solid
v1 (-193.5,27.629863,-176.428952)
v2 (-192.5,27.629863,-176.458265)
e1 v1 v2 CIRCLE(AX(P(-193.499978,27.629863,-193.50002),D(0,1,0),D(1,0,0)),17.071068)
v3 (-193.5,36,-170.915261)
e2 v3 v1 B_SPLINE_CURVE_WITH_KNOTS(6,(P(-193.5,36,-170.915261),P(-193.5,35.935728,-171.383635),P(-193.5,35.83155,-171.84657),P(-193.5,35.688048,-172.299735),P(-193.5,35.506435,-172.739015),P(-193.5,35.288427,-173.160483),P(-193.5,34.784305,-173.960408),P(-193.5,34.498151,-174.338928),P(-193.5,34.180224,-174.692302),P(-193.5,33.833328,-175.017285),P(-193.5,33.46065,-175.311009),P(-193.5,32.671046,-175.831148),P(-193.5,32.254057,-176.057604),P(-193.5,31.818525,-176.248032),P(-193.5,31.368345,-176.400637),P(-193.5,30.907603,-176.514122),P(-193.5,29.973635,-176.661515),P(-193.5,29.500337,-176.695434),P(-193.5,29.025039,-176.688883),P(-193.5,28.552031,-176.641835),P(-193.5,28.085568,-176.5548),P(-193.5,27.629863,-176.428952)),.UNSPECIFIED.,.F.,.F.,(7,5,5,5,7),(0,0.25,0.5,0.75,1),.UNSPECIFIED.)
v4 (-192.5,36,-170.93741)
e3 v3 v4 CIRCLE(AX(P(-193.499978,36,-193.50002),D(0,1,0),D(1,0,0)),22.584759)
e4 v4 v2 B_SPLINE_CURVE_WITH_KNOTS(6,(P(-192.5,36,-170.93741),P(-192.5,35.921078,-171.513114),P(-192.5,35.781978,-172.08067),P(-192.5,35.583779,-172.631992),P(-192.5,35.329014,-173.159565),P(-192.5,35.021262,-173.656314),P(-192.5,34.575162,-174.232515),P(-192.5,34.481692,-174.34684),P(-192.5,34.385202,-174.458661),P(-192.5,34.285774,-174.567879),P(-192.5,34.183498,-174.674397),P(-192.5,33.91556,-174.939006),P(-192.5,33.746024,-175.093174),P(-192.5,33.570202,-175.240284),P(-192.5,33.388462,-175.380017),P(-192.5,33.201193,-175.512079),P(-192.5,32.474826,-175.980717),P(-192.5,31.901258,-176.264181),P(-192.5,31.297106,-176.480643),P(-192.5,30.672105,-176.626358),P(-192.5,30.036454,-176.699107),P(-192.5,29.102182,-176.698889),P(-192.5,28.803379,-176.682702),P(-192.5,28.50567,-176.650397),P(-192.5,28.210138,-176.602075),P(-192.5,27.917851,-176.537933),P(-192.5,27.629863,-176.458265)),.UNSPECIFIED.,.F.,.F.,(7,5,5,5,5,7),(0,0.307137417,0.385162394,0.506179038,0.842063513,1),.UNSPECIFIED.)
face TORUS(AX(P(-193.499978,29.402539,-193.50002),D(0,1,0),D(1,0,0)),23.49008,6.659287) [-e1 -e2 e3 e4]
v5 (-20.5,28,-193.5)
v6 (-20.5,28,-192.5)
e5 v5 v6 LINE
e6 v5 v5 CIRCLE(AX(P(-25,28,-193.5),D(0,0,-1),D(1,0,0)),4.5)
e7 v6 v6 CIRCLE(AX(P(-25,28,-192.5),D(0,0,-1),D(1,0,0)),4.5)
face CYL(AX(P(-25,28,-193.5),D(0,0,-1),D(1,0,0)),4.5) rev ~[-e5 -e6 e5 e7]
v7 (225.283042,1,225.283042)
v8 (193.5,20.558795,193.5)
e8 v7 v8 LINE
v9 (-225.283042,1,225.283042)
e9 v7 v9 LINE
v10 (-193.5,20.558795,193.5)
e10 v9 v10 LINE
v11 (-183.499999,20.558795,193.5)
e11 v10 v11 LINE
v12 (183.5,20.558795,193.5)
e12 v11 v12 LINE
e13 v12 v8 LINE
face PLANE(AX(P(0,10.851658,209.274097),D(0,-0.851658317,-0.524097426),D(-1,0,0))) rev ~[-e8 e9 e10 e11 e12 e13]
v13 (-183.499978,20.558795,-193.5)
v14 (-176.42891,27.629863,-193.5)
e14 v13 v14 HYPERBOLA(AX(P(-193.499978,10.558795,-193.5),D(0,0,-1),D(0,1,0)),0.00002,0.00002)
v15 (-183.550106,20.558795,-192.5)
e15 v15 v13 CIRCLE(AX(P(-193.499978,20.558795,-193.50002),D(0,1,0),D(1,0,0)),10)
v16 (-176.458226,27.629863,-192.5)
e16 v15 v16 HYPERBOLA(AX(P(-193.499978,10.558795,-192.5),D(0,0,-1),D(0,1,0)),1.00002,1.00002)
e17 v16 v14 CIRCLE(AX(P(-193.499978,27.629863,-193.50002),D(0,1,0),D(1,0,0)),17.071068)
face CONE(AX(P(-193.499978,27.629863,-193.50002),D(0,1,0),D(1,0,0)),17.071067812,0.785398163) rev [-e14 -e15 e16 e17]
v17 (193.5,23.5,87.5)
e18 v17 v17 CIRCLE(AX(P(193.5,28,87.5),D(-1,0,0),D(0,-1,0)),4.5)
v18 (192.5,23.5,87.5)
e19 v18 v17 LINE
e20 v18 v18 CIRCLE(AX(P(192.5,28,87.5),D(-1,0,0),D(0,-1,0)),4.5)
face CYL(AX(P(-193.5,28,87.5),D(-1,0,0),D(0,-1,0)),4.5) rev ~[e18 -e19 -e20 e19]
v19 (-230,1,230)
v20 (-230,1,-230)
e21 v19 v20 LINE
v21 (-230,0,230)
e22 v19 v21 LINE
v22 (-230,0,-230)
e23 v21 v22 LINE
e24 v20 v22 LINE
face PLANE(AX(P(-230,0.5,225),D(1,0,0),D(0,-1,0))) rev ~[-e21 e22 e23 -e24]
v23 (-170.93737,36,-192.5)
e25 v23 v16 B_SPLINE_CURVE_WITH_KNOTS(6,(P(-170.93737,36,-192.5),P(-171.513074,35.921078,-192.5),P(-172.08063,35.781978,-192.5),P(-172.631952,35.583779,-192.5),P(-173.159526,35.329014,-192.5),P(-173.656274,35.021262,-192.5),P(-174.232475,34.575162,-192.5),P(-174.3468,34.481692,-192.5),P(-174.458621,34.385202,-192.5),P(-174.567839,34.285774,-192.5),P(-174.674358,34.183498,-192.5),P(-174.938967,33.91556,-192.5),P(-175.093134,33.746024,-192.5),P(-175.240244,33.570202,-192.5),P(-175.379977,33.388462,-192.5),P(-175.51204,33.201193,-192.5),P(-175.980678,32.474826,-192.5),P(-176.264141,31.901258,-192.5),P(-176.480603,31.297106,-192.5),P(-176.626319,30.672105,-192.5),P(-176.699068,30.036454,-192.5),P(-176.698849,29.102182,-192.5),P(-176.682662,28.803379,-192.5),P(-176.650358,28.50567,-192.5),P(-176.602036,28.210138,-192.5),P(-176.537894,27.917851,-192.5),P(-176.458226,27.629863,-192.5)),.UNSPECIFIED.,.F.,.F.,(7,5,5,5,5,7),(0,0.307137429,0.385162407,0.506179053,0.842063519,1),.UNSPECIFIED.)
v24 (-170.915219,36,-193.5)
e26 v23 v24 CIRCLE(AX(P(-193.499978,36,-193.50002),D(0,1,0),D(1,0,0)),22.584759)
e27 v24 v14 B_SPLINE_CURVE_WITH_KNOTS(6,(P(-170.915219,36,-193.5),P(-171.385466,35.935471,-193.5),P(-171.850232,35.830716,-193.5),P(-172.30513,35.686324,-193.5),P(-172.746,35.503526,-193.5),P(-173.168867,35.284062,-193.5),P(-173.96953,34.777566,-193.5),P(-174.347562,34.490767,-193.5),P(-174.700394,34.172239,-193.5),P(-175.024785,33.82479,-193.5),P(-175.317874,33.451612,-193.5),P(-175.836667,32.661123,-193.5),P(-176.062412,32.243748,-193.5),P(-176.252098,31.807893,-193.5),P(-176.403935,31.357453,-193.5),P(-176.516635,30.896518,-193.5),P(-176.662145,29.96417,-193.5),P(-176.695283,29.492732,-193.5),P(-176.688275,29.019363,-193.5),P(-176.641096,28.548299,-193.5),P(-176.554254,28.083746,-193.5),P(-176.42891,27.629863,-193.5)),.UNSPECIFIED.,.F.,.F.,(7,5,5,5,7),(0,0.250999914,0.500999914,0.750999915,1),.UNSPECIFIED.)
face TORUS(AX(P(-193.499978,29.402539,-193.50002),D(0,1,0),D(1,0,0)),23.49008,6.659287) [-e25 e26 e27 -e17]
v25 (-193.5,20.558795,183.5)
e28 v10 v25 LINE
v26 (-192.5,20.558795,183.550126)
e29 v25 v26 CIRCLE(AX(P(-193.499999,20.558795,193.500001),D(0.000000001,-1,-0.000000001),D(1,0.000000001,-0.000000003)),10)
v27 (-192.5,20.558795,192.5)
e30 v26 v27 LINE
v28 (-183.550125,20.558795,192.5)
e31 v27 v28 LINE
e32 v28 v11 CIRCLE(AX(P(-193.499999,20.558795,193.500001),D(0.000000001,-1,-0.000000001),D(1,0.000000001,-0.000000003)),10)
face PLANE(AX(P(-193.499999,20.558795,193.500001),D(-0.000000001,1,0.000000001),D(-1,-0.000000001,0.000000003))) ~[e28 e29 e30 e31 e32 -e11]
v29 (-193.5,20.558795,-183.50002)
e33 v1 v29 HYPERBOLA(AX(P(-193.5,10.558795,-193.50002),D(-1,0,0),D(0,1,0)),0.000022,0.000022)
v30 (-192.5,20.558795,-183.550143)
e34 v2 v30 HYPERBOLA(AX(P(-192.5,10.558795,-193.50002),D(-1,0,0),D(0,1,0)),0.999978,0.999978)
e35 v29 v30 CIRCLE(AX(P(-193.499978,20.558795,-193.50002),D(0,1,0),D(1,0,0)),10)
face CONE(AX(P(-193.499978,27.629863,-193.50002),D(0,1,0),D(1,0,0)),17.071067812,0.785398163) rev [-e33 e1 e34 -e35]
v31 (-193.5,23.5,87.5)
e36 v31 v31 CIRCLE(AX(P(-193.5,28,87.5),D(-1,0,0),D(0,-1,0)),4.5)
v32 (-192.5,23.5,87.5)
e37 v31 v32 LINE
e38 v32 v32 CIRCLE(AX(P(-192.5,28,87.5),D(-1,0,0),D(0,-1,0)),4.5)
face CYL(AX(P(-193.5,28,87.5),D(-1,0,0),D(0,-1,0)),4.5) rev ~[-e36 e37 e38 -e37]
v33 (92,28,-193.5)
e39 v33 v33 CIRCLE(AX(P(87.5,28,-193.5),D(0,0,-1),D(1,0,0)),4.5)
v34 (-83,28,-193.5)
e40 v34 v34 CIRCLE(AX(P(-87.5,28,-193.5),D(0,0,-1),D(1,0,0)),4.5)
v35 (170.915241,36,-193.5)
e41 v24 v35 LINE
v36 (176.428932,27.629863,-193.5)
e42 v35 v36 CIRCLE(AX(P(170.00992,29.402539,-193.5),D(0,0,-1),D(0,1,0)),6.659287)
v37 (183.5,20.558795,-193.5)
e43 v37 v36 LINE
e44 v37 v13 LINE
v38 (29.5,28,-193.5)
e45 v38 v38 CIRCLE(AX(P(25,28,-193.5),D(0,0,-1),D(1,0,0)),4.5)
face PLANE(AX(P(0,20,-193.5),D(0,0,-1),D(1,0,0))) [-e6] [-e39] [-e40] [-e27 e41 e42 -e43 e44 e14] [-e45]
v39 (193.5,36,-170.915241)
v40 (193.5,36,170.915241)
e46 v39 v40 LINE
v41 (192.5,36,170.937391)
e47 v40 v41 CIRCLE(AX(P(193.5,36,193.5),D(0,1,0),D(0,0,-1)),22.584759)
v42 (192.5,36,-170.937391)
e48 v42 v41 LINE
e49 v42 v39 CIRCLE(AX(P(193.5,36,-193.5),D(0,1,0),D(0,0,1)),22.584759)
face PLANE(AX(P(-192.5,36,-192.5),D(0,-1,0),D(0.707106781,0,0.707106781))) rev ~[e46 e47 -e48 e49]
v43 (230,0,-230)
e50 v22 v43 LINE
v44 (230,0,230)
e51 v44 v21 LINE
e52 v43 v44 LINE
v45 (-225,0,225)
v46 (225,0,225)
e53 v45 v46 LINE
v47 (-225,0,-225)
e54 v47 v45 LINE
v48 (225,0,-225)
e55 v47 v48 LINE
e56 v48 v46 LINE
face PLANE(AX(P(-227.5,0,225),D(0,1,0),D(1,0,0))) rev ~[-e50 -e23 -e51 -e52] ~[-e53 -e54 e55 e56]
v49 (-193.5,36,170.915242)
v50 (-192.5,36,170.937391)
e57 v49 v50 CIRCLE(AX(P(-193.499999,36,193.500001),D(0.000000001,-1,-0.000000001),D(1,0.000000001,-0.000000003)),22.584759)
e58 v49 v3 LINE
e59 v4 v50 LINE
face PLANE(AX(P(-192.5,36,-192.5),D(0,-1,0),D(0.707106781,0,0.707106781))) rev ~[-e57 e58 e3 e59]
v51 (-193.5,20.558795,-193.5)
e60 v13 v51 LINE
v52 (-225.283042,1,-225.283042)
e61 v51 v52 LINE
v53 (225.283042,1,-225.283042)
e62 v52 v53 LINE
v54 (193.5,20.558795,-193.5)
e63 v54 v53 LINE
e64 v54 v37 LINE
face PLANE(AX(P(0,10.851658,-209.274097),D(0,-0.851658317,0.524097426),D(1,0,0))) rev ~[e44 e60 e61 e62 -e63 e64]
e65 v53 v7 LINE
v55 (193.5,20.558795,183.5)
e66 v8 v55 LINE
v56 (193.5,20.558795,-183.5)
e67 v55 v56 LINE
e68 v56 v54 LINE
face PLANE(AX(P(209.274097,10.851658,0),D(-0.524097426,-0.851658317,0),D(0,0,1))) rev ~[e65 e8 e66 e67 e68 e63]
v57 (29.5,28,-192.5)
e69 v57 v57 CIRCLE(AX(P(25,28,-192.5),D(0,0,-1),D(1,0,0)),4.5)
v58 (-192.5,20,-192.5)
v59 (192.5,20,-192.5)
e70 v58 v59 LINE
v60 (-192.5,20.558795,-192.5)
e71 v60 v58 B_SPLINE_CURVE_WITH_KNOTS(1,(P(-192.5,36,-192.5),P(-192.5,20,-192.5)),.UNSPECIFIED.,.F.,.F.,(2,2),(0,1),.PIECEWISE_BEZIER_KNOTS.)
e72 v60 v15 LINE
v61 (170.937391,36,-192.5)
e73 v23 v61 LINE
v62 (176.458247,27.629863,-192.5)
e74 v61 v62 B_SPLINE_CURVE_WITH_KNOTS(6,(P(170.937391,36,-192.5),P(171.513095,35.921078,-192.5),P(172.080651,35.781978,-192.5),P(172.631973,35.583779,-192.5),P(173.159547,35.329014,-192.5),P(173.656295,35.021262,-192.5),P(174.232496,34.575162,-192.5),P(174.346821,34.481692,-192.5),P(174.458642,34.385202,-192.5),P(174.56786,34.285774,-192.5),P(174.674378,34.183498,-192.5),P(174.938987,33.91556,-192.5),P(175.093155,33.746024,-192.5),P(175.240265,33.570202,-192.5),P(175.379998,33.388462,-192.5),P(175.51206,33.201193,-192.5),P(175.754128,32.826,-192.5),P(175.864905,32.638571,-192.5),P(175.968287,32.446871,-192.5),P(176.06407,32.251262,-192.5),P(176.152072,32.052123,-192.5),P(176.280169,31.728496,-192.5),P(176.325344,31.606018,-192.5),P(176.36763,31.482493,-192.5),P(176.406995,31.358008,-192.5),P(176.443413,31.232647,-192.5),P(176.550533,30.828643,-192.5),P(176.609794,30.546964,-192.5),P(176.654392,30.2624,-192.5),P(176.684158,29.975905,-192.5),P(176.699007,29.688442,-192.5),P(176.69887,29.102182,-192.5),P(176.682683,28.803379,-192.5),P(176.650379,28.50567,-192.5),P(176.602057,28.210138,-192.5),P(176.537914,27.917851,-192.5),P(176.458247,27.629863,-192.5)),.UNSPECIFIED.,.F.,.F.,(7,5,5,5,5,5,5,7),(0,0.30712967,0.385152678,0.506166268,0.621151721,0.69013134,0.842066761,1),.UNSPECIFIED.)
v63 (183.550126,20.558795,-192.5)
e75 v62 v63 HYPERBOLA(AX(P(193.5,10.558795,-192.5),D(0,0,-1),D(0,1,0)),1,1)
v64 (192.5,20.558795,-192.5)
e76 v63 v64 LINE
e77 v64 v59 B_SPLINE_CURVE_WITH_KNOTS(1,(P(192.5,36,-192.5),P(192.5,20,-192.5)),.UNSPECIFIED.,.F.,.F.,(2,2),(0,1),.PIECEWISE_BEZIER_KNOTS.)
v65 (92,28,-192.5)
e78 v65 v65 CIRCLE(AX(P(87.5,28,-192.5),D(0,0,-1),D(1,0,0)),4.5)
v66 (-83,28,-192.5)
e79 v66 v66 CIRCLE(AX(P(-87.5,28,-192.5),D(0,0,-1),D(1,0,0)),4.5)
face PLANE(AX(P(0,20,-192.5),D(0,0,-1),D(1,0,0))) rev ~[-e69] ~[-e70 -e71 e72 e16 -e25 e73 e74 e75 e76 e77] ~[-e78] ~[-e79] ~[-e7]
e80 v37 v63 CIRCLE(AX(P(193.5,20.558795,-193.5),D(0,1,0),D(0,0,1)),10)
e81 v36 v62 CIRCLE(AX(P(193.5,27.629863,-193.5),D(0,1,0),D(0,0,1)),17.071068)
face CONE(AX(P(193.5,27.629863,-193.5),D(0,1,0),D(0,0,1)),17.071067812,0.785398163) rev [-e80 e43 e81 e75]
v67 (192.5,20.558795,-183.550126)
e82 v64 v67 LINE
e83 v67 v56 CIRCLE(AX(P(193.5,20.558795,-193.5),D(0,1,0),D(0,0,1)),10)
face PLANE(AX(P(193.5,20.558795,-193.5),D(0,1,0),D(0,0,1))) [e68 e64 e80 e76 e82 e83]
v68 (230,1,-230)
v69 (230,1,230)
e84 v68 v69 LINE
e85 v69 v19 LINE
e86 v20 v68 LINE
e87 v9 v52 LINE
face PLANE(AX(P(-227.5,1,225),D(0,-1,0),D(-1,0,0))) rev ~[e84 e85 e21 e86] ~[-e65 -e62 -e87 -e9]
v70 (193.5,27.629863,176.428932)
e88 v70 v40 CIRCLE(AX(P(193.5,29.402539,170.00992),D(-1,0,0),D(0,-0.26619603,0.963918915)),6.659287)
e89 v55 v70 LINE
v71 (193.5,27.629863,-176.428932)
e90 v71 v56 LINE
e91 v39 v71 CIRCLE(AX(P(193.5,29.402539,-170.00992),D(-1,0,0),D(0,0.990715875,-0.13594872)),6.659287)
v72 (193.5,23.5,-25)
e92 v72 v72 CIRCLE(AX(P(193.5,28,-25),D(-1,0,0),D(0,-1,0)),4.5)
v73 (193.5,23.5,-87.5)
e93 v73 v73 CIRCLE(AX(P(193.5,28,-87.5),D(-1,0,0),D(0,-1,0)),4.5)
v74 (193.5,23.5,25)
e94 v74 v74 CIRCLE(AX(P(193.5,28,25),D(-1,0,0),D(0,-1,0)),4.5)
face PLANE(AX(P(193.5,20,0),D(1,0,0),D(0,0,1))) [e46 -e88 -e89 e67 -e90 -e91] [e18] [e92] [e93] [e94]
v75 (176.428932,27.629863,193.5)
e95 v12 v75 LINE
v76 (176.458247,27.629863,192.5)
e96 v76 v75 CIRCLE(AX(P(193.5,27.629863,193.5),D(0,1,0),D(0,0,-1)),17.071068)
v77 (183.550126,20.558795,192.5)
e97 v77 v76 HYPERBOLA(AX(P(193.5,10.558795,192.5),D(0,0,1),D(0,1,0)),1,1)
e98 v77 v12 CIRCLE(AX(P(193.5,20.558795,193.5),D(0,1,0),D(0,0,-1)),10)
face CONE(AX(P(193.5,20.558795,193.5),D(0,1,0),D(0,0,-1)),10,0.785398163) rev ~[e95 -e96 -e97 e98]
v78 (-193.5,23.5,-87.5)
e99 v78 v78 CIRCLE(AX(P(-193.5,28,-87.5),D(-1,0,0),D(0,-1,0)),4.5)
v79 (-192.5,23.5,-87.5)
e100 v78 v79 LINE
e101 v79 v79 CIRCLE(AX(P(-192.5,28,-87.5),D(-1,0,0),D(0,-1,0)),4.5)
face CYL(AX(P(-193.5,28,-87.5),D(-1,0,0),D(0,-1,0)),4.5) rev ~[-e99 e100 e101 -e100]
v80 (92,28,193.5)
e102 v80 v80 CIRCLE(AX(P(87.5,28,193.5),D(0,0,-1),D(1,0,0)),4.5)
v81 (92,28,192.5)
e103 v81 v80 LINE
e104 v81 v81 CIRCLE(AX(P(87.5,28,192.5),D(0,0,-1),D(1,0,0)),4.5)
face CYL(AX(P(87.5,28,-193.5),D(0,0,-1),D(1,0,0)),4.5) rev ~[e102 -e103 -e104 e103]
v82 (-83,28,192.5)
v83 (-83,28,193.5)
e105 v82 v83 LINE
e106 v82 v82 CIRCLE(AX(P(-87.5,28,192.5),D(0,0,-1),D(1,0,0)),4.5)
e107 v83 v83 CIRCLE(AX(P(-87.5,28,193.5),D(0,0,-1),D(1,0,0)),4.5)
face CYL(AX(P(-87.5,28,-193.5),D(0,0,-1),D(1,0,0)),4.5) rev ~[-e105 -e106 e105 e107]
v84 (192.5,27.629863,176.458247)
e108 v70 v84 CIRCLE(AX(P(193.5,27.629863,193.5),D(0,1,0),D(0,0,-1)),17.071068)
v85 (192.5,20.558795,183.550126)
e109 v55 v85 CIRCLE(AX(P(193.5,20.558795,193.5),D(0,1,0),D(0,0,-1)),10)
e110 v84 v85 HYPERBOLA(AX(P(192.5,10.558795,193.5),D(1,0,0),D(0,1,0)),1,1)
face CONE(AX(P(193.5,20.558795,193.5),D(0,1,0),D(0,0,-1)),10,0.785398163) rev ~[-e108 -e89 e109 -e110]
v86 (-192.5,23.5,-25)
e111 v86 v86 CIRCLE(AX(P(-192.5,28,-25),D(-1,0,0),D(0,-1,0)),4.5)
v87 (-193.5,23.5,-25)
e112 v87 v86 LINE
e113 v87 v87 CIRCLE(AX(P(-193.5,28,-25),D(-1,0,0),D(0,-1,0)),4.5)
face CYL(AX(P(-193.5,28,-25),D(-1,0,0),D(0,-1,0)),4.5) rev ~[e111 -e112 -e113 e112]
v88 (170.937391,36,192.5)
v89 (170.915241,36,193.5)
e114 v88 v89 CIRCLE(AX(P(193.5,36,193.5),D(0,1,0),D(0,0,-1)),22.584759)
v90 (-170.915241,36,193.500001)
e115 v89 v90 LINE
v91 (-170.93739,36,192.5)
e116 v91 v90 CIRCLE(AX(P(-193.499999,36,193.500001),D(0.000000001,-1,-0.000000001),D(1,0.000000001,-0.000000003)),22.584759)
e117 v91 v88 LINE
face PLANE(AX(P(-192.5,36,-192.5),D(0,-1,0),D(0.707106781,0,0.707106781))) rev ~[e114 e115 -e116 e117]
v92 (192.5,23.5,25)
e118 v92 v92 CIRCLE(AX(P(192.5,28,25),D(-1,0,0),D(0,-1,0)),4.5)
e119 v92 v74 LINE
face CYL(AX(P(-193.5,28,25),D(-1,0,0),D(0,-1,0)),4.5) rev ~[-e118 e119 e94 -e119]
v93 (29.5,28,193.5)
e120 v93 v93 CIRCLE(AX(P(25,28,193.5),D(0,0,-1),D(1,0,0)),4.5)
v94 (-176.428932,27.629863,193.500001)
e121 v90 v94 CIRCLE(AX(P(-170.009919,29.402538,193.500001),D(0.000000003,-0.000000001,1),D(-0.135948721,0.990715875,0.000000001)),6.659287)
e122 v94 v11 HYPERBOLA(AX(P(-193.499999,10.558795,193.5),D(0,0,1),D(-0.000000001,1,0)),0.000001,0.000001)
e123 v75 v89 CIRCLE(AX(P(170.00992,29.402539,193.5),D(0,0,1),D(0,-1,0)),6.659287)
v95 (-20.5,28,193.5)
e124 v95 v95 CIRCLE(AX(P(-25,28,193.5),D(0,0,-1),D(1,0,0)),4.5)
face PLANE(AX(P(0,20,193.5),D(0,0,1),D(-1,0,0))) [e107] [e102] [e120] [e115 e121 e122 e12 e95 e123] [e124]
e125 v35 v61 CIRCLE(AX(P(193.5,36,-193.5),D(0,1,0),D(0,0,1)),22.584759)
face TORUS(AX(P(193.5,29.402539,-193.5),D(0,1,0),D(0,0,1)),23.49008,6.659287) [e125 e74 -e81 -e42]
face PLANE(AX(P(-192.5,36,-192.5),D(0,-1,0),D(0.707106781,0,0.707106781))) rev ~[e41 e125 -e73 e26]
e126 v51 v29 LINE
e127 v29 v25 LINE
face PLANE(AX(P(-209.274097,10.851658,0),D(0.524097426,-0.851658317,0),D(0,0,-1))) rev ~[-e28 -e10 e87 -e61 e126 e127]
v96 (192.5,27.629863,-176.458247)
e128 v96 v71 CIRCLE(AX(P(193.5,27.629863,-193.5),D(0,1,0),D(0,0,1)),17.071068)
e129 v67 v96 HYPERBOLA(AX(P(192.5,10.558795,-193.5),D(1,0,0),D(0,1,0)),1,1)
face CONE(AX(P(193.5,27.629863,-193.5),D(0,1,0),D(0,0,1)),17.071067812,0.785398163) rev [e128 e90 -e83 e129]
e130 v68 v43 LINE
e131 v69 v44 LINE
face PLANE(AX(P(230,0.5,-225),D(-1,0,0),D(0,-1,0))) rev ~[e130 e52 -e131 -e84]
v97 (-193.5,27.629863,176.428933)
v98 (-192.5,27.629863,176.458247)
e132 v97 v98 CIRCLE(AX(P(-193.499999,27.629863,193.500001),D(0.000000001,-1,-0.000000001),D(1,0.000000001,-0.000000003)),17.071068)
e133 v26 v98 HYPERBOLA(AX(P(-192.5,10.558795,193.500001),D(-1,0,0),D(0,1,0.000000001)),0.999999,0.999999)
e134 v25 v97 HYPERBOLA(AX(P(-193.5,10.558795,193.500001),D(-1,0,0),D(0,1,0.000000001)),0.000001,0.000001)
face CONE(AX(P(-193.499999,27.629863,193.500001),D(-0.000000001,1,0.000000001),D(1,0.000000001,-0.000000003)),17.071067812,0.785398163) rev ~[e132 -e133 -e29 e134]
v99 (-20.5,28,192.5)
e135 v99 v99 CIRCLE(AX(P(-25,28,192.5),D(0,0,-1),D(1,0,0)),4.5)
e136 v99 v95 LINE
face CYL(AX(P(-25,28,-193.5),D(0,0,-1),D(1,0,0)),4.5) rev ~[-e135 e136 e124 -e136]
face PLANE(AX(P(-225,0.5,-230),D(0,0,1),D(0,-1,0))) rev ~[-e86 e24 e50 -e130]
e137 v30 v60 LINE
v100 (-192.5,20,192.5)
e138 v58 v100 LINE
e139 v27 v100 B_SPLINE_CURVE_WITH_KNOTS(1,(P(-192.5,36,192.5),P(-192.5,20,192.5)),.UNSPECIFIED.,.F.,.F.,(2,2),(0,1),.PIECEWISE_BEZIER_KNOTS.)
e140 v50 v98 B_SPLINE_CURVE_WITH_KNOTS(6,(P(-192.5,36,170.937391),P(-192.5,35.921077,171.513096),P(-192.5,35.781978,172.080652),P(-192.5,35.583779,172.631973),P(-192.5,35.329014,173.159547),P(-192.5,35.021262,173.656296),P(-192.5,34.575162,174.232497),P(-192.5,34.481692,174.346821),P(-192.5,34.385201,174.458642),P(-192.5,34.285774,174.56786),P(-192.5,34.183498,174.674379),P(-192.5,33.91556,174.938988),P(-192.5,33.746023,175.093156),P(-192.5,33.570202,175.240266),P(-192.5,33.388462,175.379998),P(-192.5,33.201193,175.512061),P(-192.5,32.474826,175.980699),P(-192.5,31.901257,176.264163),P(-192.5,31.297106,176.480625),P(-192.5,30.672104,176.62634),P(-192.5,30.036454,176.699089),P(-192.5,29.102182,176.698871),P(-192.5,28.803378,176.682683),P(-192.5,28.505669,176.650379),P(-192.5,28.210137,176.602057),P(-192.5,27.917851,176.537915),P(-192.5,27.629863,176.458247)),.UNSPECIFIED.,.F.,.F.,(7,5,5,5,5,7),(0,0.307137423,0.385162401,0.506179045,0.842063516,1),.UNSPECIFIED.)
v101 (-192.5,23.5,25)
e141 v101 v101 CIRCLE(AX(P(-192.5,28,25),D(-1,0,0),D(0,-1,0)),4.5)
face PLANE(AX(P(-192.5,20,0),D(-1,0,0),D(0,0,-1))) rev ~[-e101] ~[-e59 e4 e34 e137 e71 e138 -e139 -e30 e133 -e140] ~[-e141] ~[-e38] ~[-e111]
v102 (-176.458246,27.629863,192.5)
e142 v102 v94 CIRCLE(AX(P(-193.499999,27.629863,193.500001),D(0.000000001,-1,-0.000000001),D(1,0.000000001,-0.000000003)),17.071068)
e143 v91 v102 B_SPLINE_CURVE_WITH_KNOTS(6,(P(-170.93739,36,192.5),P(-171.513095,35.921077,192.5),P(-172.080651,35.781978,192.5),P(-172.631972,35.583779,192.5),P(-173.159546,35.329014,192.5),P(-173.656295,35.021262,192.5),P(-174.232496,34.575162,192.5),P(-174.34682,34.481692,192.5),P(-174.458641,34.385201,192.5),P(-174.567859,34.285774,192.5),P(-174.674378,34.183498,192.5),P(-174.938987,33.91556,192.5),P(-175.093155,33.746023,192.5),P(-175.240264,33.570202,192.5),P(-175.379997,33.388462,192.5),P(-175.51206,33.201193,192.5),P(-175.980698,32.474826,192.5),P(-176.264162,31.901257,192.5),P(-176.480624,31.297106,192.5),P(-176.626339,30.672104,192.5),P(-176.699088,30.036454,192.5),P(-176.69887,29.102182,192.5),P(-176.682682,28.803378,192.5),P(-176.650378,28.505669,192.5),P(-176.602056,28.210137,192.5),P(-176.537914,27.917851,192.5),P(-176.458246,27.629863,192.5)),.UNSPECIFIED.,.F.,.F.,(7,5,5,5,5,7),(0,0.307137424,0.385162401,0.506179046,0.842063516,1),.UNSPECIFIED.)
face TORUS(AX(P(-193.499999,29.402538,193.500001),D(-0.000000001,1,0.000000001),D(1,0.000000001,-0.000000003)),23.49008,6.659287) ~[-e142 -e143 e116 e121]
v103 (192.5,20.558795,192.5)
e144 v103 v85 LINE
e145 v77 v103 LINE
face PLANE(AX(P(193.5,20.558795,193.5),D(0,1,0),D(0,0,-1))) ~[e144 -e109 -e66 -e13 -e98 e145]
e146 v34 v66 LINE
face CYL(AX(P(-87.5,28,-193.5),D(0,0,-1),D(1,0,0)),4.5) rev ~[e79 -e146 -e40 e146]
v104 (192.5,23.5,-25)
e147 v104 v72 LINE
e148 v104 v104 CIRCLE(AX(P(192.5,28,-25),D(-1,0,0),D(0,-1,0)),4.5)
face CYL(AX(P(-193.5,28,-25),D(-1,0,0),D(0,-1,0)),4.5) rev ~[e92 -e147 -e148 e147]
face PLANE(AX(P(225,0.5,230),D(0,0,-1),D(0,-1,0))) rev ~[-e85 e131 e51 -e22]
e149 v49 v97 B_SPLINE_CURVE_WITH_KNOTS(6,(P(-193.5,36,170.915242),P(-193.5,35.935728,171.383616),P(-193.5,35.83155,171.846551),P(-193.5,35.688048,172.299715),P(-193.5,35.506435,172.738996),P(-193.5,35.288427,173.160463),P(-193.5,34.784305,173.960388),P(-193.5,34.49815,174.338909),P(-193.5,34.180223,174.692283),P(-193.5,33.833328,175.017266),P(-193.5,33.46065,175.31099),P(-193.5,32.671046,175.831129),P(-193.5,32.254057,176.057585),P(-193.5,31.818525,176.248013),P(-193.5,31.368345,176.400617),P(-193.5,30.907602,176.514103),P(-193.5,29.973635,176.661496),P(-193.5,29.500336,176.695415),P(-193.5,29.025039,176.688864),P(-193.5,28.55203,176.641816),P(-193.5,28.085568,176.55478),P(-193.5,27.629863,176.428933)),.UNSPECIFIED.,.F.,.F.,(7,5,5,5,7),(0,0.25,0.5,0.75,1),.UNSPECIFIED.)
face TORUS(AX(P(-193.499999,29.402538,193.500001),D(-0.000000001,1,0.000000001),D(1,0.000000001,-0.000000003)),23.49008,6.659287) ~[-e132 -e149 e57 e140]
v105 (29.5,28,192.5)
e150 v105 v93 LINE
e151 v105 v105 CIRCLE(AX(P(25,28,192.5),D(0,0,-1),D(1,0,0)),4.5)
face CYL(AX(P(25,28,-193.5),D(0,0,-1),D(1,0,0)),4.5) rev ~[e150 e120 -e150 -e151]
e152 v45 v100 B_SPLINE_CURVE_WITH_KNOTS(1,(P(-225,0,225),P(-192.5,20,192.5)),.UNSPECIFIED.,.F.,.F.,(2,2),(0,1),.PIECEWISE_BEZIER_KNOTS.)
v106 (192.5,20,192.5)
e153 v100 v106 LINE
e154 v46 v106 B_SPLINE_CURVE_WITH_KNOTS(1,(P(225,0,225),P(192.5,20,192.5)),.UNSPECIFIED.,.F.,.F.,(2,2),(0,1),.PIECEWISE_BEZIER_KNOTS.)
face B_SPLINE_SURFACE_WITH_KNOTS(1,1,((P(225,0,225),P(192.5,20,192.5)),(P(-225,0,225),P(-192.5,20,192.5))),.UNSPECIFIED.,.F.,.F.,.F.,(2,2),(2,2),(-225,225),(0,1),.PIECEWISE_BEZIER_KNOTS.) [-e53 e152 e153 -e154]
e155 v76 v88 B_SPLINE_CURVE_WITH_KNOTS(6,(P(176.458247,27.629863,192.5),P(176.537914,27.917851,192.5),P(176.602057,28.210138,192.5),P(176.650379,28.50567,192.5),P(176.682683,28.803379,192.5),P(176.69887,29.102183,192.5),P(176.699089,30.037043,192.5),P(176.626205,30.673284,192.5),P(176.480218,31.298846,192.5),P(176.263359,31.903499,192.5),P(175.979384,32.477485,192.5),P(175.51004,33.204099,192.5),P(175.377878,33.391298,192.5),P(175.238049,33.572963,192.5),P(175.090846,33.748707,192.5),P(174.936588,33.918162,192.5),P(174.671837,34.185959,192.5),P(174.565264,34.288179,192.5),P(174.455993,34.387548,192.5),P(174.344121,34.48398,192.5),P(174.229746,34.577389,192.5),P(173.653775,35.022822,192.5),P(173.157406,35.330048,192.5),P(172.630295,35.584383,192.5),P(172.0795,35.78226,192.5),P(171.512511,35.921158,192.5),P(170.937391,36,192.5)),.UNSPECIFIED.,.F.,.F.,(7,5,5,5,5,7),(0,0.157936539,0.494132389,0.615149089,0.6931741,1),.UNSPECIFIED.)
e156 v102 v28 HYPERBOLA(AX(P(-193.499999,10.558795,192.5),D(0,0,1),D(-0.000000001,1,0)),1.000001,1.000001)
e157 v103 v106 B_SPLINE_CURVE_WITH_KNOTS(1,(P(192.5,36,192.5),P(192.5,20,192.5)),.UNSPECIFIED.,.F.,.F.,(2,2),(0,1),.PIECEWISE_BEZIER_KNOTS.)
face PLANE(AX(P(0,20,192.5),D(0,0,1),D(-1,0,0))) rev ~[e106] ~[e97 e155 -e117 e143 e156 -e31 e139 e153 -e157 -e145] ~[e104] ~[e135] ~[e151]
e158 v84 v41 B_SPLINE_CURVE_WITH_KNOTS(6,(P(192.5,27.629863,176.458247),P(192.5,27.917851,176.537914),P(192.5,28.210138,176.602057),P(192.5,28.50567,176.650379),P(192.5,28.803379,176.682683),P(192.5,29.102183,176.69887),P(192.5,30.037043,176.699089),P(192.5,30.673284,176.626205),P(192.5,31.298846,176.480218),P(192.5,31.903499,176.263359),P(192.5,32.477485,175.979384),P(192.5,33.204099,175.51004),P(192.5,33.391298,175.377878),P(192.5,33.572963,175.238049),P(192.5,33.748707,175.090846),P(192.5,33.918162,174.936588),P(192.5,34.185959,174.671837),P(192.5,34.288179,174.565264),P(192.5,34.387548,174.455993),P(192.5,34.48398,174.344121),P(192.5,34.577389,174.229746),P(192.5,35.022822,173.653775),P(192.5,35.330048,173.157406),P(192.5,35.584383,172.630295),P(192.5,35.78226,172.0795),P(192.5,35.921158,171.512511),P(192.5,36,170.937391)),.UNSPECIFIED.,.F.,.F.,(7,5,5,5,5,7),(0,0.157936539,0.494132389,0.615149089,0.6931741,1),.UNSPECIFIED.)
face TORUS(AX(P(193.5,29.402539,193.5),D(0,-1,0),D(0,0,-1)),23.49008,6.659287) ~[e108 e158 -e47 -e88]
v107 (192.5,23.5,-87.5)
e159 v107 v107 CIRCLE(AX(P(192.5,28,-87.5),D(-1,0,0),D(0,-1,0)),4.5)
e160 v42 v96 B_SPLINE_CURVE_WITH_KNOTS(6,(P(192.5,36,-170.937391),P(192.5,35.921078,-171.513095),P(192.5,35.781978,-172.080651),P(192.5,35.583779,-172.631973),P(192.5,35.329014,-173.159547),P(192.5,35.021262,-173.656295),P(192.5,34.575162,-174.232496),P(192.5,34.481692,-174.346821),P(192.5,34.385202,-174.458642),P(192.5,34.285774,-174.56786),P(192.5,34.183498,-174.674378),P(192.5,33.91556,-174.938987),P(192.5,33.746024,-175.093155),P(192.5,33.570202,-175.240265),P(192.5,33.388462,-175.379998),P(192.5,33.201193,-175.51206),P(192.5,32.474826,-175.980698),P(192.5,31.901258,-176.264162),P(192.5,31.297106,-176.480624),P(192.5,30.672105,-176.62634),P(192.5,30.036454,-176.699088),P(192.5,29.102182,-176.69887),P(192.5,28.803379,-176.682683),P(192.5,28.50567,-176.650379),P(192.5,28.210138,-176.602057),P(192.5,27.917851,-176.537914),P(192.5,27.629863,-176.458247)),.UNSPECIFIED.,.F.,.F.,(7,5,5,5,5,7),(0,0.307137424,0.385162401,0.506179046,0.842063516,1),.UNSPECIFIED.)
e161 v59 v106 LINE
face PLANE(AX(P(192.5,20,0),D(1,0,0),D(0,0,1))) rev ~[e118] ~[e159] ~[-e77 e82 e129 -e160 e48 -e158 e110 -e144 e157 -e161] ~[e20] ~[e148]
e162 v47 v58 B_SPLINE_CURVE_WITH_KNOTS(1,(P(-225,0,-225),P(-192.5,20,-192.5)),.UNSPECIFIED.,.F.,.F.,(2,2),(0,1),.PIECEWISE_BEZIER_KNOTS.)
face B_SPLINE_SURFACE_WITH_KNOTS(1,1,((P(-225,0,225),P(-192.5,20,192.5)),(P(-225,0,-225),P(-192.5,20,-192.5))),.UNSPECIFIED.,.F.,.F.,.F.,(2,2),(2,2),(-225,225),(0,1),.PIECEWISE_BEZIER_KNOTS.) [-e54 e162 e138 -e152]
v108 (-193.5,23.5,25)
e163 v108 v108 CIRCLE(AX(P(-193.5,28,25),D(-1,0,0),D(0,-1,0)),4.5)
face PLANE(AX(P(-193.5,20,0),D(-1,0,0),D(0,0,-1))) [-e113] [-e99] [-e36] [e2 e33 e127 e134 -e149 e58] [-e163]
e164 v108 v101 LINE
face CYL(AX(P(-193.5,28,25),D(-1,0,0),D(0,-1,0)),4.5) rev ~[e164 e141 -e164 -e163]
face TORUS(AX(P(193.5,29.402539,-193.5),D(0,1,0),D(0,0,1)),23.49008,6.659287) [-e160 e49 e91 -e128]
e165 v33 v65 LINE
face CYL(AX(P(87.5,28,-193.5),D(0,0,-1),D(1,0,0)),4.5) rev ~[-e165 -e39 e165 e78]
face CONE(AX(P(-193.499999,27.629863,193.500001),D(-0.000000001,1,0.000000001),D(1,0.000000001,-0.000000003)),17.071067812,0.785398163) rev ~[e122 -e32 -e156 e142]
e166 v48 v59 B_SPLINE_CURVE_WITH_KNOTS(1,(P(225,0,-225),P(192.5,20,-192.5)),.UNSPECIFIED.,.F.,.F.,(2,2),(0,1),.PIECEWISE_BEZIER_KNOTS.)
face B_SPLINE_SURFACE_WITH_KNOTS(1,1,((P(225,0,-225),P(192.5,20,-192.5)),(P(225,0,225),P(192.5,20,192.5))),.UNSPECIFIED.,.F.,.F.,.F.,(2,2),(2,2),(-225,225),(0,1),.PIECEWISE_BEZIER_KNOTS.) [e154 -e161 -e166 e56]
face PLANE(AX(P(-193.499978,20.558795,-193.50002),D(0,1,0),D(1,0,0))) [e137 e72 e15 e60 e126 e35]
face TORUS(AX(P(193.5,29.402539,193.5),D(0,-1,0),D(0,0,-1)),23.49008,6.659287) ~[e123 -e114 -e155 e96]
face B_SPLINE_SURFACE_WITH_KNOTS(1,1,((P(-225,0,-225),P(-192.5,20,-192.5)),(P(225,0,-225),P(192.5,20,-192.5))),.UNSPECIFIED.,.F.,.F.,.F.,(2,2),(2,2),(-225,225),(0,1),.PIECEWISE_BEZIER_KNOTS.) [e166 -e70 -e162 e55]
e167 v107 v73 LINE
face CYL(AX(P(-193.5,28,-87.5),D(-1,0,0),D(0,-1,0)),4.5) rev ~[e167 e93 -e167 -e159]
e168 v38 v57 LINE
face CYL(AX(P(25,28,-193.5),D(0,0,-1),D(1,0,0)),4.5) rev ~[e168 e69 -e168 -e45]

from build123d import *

# Parameters (mm, degrees)
F0_W             = 450
F0_H             = 450
F2_W             = 385
F2_H             = 385
F5_W             = 385
F5_H             = 385
F3_FACE_W        = 385
F3_FACE_H        = 385
F7_T             = 1
F12_COPIES_COUNT = 2
F12_COPIES_ANGLE = 90
F14_R            = 4.5
F15_DEPTH        = 420.4090421903
F16_R            = 4.5
F17_DEPTH        = 420.4090421903
F18_W            = 1
F18_H            = 5


# Not quite as in the source:
# - a feature of the source that left no trace in its solid (it failed there, or was rolled back) is left out
# - a pattern or mirror of a feature is missing from the dataset's text; its kind, count and spacing are read off the source's solid


with BuildPart() as f3:
    # F0 (on Front) → F3 section 0
    with BuildSketch(Plane.XZ):
        Rectangle(F0_W, F0_H)
    # F2 (on offset) → F3 section 1
    with BuildSketch(Plane.XZ.offset(-20)):
        Rectangle(F2_W, F2_H)
    loft()

    # F5 (on offset) → F6 section 0
    with BuildSketch(Plane.XZ.offset(-36)):
        Rectangle(F5_W, F5_H)
    # F3_face (on face) → F6 section 1
    with BuildSketch(Plane(origin=(0, 20, 0), x_dir=(-1, 0, 0), z_dir=(0, 1, 0))):
        Rectangle(F3_FACE_W, F3_FACE_H)
    loft()

    # F7
    f7_openings = [f3.faces().sort_by_distance(p)[0] for p in [
        (0, 0, 0),
        (0, 36, 0),
    ]]
    offset(amount=F7_T, openings=f7_openings, kind=Kind.INTERSECTION)

    # F8 (on face) → F10 (revolve, cut)
    with BuildSketch(Plane(origin=(-193.5, 0, 0), x_dir=(0, -1, 0), z_dir=(-1, 0, 0))):
        with BuildLine():
            Line((-20.558795194, -193.5), (-20.558795194, -192.5))
            add(Edge.make_bspline(
                [(-36, -192.5), (-20.558795194, -192.5)],
                knots=[0, 0, 0.9650753004, 0.9650753004], degree=1))
            Line((-36, -192.5), (-36, -193.5))
            Line((-36, -193.5), (-20.558795194, -193.5))
        make_face()
    revolve(axis=Axis((-193.5, 28.279397597, -193.5), (0, 1, 0)), mode=Mode.SUBTRACT)

    # F11 (on face) → F12 (revolve, cut)
    with BuildSketch(Plane.YZ.offset(193.5)):
        with BuildLine():
            Line((27.6298630059, -176.4289321881), (20.558795194, -183.5))
            Line((20.558795194, -183.5), (20.558795194, -192.5))
            add(Edge.make_bspline(
                [(36, -192.5), (20.558795194, -192.5)],
                knots=[0, 0, 0.9650753004, 0.9650753004], degree=1))
            Line((36, -192.5), (36, -170.9152411143))
            ThreePointArc((36, -170.9152411143), (33.0658481949, -175.5710584905), (27.6298630059, -176.4289321881))
        make_face()
        with BuildLine():
            add(Edge.make_bspline(
                [(36, -192.5), (20.558795194, -192.5)],
                knots=[0, 0, 0.9650753004, 0.9650753004], degree=1))
            Line((20.558795194, -192.5), (20.558795194, -193.5))
            Line((20.558795194, -193.5), (36, -193.5))
            Line((36, -193.5), (36, -192.5))
        make_face()
    f12 = revolve(axis=Axis((193.5, 28.279397597, -193.5), (0, 1, 0)), mode=Mode.SUBTRACT)

    # F12_copies: F12 ×2 about axis
    f12_copies_axis = Axis((1e-06, 0, -2.1e-05), (0, 1, 0))
    for i in range(1, F12_COPIES_COUNT):
        add(f12.rotate(f12_copies_axis, i * F12_COPIES_ANGLE / (F12_COPIES_COUNT - 1)), mode=Mode.SUBTRACT)

    # F12_copies1: F12 across plane
    add(f12.mirror(Plane(origin=(0, 0, 0), x_dir=(0.7071067823, 0, 0.7071067801), z_dir=(-0.7071067801, -6e-10, 0.7071067823))), mode=Mode.SUBTRACT)

    # F11 (on face) → F13 (revolve, cut)
    with BuildSketch(Plane.YZ.offset(193.5)):
        with BuildLine():
            Line((20.558795194, 193.5), (20.558795194, 192.5))
            add(Edge.make_bspline(
                [(36, 192.5), (20.558795194, 192.5)],
                knots=[0, 0, 0.9650753004, 0.9650753004], degree=1))
            Line((36, 192.5), (36, 193.5))
            Line((36, 193.5), (20.558795194, 193.5))
        make_face()
        with BuildLine():
            add(Edge.make_bspline(
                [(36, 192.5), (20.558795194, 192.5)],
                knots=[0, 0, 0.9650753004, 0.9650753004], degree=1))
            Line((20.558795194, 192.5), (20.558795194, 183.5))
            Line((20.558795194, 183.5), (27.6298630059, 176.4289321881))
            ThreePointArc((27.6298630059, 176.4289321881), (33.0658481949, 175.5710584905), (36, 170.9152411143))
            Line((36, 170.9152411143), (36, 192.5))
        make_face()
    revolve(axis=Axis((193.5, 28.279397597, 193.5), (0, 1, 0)), mode=Mode.SUBTRACT)

    # F14 (on face) → F15 (cut, through all)
    with BuildSketch(Plane(origin=(0, 0, -193.5), x_dir=(1, 0, 0), z_dir=(0, 0, -1))):
        with Locations((-25, -28)):
            Circle(F14_R)
        with Locations((25, -28)):
            Circle(F14_R)
        with Locations((-87.5, -28)):
            Circle(F14_R)
        with Locations((87.5, -28)):
            Circle(F14_R)
    extrude(amount=-F15_DEPTH, mode=Mode.SUBTRACT)

    # F16 (on face) → F17 (cut, through all)
    with BuildSketch(Plane(origin=(-193.5, 0, 0), x_dir=(0, -1, 0), z_dir=(-1, 0, 0))):
        with Locations((-28, 25)):
            Circle(F16_R)
        with Locations((-28, 87.5)):
            Circle(F16_R)
        with Locations((-28, -25)):
            Circle(F16_R)
        with Locations((-28, -87.5)):
            Circle(F16_R)
    extrude(amount=-F17_DEPTH, mode=Mode.SUBTRACT)

    # F19: sweep along a path in F19_path
    with BuildLine(Plane(origin=(-225, 0, 225), x_dir=(0, 0, -1), z_dir=(0, 1, 0))) as f19_path:
        Line((0, 0), (450, 0))
        Line((450, 0), (450, -450))
        Line((450, -450), (0, -450))
        Line((0, -450), (0, 0))
    # F18 (on Right) → F19 (sweep)
    with BuildSketch(Plane.YZ):
        with Locations((0.5, 227.5)):
            Rectangle(F18_W, F18_H)
    sweep(path=f19_path.line, transition=Transition.RIGHT)


solid = f3.part
